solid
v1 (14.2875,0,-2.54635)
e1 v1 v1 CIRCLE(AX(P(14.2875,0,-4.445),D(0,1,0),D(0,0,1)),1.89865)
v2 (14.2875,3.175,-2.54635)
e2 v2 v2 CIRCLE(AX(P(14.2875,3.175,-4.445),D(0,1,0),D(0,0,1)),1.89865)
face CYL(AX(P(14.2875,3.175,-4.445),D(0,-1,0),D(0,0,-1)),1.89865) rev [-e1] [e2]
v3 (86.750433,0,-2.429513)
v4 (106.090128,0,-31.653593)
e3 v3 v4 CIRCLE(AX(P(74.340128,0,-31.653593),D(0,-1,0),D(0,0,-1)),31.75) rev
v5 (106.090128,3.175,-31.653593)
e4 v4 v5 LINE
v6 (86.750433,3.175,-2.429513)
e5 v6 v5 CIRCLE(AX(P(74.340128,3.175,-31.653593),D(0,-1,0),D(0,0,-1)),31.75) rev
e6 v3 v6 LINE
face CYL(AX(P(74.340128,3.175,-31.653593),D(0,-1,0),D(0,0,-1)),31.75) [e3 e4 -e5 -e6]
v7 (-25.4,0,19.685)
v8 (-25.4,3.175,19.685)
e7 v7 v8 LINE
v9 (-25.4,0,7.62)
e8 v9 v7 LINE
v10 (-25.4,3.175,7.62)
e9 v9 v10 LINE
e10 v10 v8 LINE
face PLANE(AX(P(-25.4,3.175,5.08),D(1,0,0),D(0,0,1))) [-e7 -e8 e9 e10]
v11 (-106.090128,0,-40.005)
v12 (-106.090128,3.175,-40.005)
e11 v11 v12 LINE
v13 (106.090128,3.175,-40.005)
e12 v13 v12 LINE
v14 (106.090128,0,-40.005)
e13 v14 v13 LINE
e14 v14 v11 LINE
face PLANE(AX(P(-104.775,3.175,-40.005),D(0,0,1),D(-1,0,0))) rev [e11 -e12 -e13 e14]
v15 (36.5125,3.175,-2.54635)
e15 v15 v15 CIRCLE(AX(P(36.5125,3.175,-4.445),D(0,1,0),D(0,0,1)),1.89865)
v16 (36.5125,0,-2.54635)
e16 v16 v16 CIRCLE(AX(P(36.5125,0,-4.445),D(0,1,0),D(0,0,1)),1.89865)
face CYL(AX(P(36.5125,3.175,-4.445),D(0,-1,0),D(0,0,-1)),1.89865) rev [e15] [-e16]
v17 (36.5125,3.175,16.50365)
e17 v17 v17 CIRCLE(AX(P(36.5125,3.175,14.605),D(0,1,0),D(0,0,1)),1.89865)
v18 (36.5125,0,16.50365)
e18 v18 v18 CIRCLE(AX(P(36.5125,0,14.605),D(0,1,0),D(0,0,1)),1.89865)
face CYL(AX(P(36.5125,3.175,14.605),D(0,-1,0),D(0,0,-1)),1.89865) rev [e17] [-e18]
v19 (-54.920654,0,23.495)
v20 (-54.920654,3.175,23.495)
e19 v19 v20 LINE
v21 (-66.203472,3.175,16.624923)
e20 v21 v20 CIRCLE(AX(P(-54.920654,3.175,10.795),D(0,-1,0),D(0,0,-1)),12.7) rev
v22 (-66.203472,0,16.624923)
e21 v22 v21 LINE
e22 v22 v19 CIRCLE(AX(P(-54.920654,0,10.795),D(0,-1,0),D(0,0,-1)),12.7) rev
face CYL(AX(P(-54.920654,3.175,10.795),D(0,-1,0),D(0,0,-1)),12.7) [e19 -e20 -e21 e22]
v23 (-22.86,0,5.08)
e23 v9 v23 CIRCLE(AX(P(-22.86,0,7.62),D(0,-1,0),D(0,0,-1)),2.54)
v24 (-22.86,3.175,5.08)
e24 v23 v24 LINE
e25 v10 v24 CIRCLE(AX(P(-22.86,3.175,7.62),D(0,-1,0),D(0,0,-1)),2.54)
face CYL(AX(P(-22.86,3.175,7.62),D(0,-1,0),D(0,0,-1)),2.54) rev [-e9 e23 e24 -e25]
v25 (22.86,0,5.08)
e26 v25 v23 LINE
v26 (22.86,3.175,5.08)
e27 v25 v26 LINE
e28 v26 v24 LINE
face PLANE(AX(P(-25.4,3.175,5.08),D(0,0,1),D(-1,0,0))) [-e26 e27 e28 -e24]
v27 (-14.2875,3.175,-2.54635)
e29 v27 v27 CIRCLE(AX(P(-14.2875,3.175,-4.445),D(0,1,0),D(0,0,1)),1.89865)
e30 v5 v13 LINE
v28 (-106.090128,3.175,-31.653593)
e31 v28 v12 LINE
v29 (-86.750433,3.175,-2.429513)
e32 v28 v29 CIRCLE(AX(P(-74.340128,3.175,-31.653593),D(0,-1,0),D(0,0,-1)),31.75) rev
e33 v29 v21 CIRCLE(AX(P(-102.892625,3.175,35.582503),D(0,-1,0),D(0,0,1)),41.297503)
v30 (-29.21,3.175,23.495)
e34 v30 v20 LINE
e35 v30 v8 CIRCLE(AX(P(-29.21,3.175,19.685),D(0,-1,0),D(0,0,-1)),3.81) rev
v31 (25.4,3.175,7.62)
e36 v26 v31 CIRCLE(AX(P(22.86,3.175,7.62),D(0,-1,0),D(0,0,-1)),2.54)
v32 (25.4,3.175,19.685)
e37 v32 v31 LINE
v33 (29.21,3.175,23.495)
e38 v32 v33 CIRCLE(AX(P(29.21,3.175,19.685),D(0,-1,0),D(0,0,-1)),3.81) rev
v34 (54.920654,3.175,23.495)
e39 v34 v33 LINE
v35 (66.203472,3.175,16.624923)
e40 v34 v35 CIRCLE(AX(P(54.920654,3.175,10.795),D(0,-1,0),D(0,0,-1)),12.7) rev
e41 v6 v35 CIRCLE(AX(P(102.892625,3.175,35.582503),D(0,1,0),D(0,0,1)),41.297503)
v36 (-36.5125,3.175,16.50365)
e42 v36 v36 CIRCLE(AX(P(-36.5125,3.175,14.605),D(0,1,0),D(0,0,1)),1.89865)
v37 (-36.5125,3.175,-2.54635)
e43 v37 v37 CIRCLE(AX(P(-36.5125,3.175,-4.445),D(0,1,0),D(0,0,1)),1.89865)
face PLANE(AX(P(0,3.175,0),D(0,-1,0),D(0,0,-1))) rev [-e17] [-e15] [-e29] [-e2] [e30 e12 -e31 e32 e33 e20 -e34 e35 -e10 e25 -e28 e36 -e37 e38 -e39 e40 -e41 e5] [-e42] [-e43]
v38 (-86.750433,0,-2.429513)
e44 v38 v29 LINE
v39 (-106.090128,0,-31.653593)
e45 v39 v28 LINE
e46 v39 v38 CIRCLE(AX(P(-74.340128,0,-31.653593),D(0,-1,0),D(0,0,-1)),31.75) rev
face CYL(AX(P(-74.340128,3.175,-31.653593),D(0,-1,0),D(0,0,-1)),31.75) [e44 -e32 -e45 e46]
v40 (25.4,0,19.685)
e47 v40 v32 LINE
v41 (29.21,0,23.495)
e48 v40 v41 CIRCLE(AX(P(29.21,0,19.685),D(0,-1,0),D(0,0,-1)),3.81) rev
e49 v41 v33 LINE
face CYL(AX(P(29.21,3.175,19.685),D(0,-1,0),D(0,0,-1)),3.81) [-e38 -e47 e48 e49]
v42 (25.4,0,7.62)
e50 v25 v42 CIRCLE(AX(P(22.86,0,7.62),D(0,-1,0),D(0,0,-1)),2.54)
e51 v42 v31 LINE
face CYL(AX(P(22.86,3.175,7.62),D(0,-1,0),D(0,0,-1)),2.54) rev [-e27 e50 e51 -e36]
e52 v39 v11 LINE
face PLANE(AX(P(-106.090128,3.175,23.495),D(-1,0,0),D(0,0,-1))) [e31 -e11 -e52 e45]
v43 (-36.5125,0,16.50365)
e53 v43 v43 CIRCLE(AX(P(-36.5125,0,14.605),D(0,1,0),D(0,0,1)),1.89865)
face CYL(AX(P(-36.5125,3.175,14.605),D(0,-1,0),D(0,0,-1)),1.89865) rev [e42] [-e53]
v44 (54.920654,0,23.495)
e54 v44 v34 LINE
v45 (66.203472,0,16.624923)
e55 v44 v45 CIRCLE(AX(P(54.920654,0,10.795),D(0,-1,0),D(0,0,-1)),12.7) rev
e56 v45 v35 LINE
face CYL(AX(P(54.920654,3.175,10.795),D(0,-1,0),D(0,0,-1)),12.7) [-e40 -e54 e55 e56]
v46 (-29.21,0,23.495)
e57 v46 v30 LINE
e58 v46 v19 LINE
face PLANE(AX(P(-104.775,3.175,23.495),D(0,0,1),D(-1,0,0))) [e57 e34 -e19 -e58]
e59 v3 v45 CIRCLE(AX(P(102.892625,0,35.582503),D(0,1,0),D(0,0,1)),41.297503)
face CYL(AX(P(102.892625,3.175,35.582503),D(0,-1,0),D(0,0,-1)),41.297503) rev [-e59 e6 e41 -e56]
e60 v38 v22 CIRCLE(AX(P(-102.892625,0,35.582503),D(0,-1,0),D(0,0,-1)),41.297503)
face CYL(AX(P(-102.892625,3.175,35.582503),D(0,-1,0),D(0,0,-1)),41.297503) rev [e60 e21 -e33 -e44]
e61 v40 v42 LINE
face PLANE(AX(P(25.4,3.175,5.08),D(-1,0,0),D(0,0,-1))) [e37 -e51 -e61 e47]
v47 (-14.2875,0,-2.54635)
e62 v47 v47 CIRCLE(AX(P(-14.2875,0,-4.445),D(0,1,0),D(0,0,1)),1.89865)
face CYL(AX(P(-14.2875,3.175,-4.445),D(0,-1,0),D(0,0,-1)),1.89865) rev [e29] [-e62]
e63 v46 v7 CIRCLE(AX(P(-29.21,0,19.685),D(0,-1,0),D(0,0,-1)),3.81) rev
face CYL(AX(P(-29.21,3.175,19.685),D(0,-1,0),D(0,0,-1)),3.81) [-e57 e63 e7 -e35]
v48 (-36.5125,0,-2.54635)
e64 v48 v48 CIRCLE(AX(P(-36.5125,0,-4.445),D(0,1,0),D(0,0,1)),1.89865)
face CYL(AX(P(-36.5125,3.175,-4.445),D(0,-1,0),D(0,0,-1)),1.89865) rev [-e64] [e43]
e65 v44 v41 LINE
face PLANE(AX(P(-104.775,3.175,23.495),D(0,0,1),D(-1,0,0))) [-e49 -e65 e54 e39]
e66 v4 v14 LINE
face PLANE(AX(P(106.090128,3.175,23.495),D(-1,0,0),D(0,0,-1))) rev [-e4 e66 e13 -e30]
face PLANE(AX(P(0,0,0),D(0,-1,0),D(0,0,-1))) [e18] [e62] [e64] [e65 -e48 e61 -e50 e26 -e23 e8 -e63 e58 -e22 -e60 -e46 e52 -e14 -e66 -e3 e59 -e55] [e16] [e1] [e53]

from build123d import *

# Parameters (mm, degrees)
SKETCH1_W              = 209.55
SKETCH1_H              = 80.01
BOSS_EXTRUDE1_DEPTH    = 3.175
SKETCH3_R              = 1.89865
CUT_EXTRUDE1_DEPTH     = 113.197510111
SKETCH29_W             = 209.55
SKETCH29_H             = 16.51
CUT_EXTRUDE6_DEPTH     = 113.197510111
BOSS_EXTRUDE6_DEPTH    = 63.5
CUT_EXTRUDE3_DEPTH     = 138.912061642
CUT_EXTRUDE4_DEPTH     = 138.357542769
CUT_EXTRUDE7_REACH     = 139.912
SKETCH30_W             = 50.8
SKETCH30_H             = 18.415
CUT_EXTRUDE9_DEPTH     = 138.912061642
FILLET6_R              = 12.7
FILLET8_R              = 2.54
FILLET9_R              = 3.81
FILLET11_R             = 31.75
CONVERT_SOLID4_START   = -2
CONVERT_SOLID4_DEPTH   = 2
CONVERT_SOLID4_2_DEPTH = 3.175


with BuildPart() as part:
    # Sketch1 → Boss-Extrude1 (new body)
    with BuildSketch(Plane(origin=(0, 0, 0), x_dir=(1, 0, 0), z_dir=(0, 1, 0))):
        Rectangle(SKETCH1_W, SKETCH1_H)
    extrude(amount=BOSS_EXTRUDE1_DEPTH)

    # Sketch3 → Cut-Extrude1 (cut, through all)
    with BuildSketch(Plane(origin=(0, 3.175, 0), x_dir=(1, 0, 0), z_dir=(0, 1, 0))):
        with Locations(Location((36.5125, -14.605, 0), (0, 0, 270))):
            Circle(SKETCH3_R)
        with Locations(Location((14.2875, -14.605, 0), (0, 0, 270))):
            Circle(SKETCH3_R)
        with Locations(Location((-14.2875, -14.605, 0), (0, 0, 270))):
            Circle(SKETCH3_R)
        with Locations(Location((-36.5125, -14.605, 0), (0, 0, 270))):
            Circle(SKETCH3_R)
        with Locations(Location((36.5125, 4.445, 0), (0, 0, 270))):
            Circle(SKETCH3_R)
        with Locations(Location((14.2875, 4.445, 0), (0, 0, 270))):
            Circle(SKETCH3_R)
        with Locations(Location((-14.2875, 4.445, 0), (0, 0, 270))):
            Circle(SKETCH3_R)
        with Locations(Location((-36.5125, 4.445, 0), (0, 0, 270))):
            Circle(SKETCH3_R)
    extrude(amount=-CUT_EXTRUDE1_DEPTH, mode=Mode.SUBTRACT)

    # Sketch29 → Cut-Extrude6 (cut, through all)
    with BuildSketch(Plane(origin=(0, 3.175, 0), x_dir=(1, 0, 0), z_dir=(0, 1, 0))):
        with Locations((0, -31.75)):
            Rectangle(SKETCH29_W, SKETCH29_H)
    extrude(amount=-CUT_EXTRUDE6_DEPTH, mode=Mode.SUBTRACT)

    # Sketch19 → Boss-Extrude6 (add, through all)
    with BuildSketch(Plane(origin=(0, 0, -40.005), x_dir=(-1, 0, 0), z_dir=(0, 0, -1))):
        Polygon((-104.775, 0), (-127.225640303, -22.450640303), (-129.470704333, -20.205576272), (-106.090128061, 3.175), (-104.775, 3.175), align=None)
    boss_extrude6 = extrude(amount=-BOSS_EXTRUDE6_DEPTH)

    # Sketch25 → Cut-Extrude3 (cut, through all)
    with BuildSketch(Plane(origin=(0, 3.175, 0), x_dir=(1, 0, 0), z_dir=(0, 1, 0))):
        with BuildLine():
            Line((144.190128061, 11.508273959), (97.502219088, 5.361694136))
            ThreePointArc((97.502219088, 5.361694136), (75.663289052, -66.631609949), (144.190128061, -35.58250314))
            Line((144.190128061, -35.58250314), (144.190128061, 11.508273959))
        make_face()
    cut_extrude3 = extrude(amount=-CUT_EXTRUDE3_DEPTH, mode=Mode.SUBTRACT)

    # Sketch26 → Cut-Extrude4 (cut, through all)
    with BuildSketch(Plane(origin=(0, 0, 0), x_dir=(0, 0, -1), z_dir=(1, 0, 0))):
        Polygon((40.005, 3.175), (14.379359697, -22.450640303), (40.005, -22.450640303), align=None)
    cut_extrude4 = extrude(amount=CUT_EXTRUDE4_DEPTH, mode=Mode.SUBTRACT)

    # Sketch30 → Cut-Extrude7 (cut, up to next)
    with BuildSketch(Plane(origin=(0, 3.175, 0), x_dir=(1, 0, 0), z_dir=(0, 1, 0)), mode=Mode.PRIVATE) as cut_extrude7_sk1:
        with Locations((0, -14.2875)):
            Rectangle(SKETCH30_W, SKETCH30_H)
    cut_extrude7_tool1 = extrude(cut_extrude7_sk1.sketch, amount=-CUT_EXTRUDE7_REACH, mode=Mode.PRIVATE) & part.part
    add(cut_extrude7_tool1.solids().sort_by_distance((0, 3.175, 14.2875))[0], mode=Mode.SUBTRACT)

    # Mirror9: Boss-Extrude6, Cut-Extrude3, Cut-Extrude4 across plane
    add(boss_extrude6.mirror(Plane(origin=(0, 0, 0), x_dir=(0, 0, 1), z_dir=(1, 0, 0))))
    add(cut_extrude3.mirror(Plane(origin=(0, 0, 0), x_dir=(0, 0, 1), z_dir=(1, 0, 0))), mode=Mode.SUBTRACT)
    add(cut_extrude4.mirror(Plane(origin=(0, 0, 0), x_dir=(0, 0, 1), z_dir=(1, 0, 0))), mode=Mode.SUBTRACT)

    # Sketch32 → Cut-Extrude9 (cut, through all)
    with BuildSketch(Plane(origin=(0, 3.175, 0), x_dir=(1, 0, 0), z_dir=(0, 1, 0))):
        Polygon((-106.090128061, 6.492313801), (-106.090128061, 40.005), (-129.470704333, 16.624423728), (-129.470704333, 9.570425062), align=None)
        Polygon((106.090128061, 6.492313801), (106.090128061, 40.005), (129.470704333, 16.624423728), (129.470704333, 9.570425062), align=None)
    extrude(amount=-CUT_EXTRUDE9_DEPTH, mode=Mode.SUBTRACT)

    # Fillet6
    fillet6_edges = [part.edges().sort_by_distance(p)[0] for p in [
        (-63.403689339, 1.5875, 23.495),
        (63.403689339, 1.5875, 23.495),
    ]]
    fillet(fillet6_edges, radius=FILLET6_R)

    # Fillet8
    fillet8_edges = [part.edges().sort_by_distance(p)[0] for p in [
        (25.4, 1.5875, 5.08),
        (-25.4, 1.5875, 5.08),
    ]]
    fillet(fillet8_edges, radius=FILLET8_R)

    # Fillet9
    fillet9_edges = [part.edges().sort_by_distance(p)[0] for p in [
        (25.4, 1.5875, 23.495),
        (-25.4, 1.5875, 23.495),
    ]]
    fillet(fillet9_edges, radius=FILLET9_R)

    # Fillet11
    # the kernel refuses this fillet: 31.75 mm, written as the material it takes off along each edge
    with BuildSketch(Plane(origin=(-106.090128061, 66.078198255, -6.492313801), x_dir=(0.9786385895506081, 0, 0.20558820744973783), z_dir=(0, -1, 0))) as fillet11_piece_1:
        with BuildLine():
            CenterArc((25.898912909, -31.151224474), FILLET11_R, 101.145067179, 66.990998507)
            Line((-5.172862309, -24.623798888), (-8.280039831, -23.971056329))
            Line((-8.280039831, -23.971056329), (-3.107177522, 0.652742559))
            Line((-3.107177522, 0.652742559), (0.241590205, 3.165795188))
            ThreePointArc((0.241590205, 3.165795188), (8.8784914, 2.506690411), (19.14812824, 3.115122447))
            Line((19.14812824, 3.115122447), (19.761835937, 0))
        make_face()
    extrude(amount=130.296524571, mode=Mode.SUBTRACT)
    with BuildSketch(Plane(origin=(106.090128061, 66.078198255, -6.492313801), x_dir=(-0.9786385895506081, 0, 0.20558820744973783), z_dir=(0, -1, 0))) as fillet11_piece_2:
        with BuildLine():
            CenterArc((25.898912909, 31.151224474), FILLET11_R, 191.863934313, 66.990998507)
            Line((-5.172862309, 24.623798888), (-8.280039831, 23.971056329))
            Line((-8.280039831, 23.971056329), (-3.107177522, -0.652742559))
            Line((-3.107177522, -0.652742559), (0.241590205, -3.165795188))
            ThreePointArc((0.241590205, -3.165795188), (8.8784914, -2.506690411), (19.14812824, -3.115122447))
            Line((19.14812824, -3.115122447), (19.761835937, 0))
        make_face()
    extrude(amount=130.296524571, mode=Mode.SUBTRACT)

    # Convert-Solid4: read off the stored shape, not the designer's step
    # Convert-Solid4 outline → Convert-Solid4 (cut)
    with BuildSketch(Plane(origin=(0, 0, 0), x_dir=(1, 0, 0), z_dir=(0, 1, 0)).offset(CONVERT_SOLID4_START)):
        with BuildLine():
            Line((106.090128061, 31.653593103), (106.090128061, 40.005))
            Line((106.090128061, 40.005), (-106.090128061, 40.005))
            Line((-106.090128061, 40.005), (-106.090128061, 31.653593103))
            ThreePointArc((-106.090128061, 31.653593103), (-105.626557255, 26.247869444), (-104.249381712, 21))
            Line((-104.249381712, 21), (104.249381712, 21))
            ThreePointArc((104.249381712, 21), (105.626557255, 26.247869444), (106.090128061, 31.653593103))
        make_face()
    extrude(amount=CONVERT_SOLID4_DEPTH, mode=Mode.SUBTRACT)

    # Convert-Solid4 2 outline → Convert-Solid4 2 (add)
    with BuildSketch(Plane(origin=(0, 0, 0), x_dir=(1, 0, 0), z_dir=(0, 1, 0))):
        with BuildLine():
            Line((106.090128061, 31.653593103), (106.090128061, 40.005))
            Line((106.090128061, 40.005), (-106.090128061, 40.005))
            Line((-106.090128061, 40.005), (-106.090128061, 31.653593103))
            ThreePointArc((-106.090128061, 31.653593103), (-105.626557255, 26.247869444), (-104.249381712, 21))
            Line((-104.249381712, 21), (104.249381712, 21))
            ThreePointArc((104.249381712, 21), (105.626557255, 26.247869444), (106.090128061, 31.653593103))
        make_face()
    extrude(amount=CONVERT_SOLID4_2_DEPTH)


solid = part.part
